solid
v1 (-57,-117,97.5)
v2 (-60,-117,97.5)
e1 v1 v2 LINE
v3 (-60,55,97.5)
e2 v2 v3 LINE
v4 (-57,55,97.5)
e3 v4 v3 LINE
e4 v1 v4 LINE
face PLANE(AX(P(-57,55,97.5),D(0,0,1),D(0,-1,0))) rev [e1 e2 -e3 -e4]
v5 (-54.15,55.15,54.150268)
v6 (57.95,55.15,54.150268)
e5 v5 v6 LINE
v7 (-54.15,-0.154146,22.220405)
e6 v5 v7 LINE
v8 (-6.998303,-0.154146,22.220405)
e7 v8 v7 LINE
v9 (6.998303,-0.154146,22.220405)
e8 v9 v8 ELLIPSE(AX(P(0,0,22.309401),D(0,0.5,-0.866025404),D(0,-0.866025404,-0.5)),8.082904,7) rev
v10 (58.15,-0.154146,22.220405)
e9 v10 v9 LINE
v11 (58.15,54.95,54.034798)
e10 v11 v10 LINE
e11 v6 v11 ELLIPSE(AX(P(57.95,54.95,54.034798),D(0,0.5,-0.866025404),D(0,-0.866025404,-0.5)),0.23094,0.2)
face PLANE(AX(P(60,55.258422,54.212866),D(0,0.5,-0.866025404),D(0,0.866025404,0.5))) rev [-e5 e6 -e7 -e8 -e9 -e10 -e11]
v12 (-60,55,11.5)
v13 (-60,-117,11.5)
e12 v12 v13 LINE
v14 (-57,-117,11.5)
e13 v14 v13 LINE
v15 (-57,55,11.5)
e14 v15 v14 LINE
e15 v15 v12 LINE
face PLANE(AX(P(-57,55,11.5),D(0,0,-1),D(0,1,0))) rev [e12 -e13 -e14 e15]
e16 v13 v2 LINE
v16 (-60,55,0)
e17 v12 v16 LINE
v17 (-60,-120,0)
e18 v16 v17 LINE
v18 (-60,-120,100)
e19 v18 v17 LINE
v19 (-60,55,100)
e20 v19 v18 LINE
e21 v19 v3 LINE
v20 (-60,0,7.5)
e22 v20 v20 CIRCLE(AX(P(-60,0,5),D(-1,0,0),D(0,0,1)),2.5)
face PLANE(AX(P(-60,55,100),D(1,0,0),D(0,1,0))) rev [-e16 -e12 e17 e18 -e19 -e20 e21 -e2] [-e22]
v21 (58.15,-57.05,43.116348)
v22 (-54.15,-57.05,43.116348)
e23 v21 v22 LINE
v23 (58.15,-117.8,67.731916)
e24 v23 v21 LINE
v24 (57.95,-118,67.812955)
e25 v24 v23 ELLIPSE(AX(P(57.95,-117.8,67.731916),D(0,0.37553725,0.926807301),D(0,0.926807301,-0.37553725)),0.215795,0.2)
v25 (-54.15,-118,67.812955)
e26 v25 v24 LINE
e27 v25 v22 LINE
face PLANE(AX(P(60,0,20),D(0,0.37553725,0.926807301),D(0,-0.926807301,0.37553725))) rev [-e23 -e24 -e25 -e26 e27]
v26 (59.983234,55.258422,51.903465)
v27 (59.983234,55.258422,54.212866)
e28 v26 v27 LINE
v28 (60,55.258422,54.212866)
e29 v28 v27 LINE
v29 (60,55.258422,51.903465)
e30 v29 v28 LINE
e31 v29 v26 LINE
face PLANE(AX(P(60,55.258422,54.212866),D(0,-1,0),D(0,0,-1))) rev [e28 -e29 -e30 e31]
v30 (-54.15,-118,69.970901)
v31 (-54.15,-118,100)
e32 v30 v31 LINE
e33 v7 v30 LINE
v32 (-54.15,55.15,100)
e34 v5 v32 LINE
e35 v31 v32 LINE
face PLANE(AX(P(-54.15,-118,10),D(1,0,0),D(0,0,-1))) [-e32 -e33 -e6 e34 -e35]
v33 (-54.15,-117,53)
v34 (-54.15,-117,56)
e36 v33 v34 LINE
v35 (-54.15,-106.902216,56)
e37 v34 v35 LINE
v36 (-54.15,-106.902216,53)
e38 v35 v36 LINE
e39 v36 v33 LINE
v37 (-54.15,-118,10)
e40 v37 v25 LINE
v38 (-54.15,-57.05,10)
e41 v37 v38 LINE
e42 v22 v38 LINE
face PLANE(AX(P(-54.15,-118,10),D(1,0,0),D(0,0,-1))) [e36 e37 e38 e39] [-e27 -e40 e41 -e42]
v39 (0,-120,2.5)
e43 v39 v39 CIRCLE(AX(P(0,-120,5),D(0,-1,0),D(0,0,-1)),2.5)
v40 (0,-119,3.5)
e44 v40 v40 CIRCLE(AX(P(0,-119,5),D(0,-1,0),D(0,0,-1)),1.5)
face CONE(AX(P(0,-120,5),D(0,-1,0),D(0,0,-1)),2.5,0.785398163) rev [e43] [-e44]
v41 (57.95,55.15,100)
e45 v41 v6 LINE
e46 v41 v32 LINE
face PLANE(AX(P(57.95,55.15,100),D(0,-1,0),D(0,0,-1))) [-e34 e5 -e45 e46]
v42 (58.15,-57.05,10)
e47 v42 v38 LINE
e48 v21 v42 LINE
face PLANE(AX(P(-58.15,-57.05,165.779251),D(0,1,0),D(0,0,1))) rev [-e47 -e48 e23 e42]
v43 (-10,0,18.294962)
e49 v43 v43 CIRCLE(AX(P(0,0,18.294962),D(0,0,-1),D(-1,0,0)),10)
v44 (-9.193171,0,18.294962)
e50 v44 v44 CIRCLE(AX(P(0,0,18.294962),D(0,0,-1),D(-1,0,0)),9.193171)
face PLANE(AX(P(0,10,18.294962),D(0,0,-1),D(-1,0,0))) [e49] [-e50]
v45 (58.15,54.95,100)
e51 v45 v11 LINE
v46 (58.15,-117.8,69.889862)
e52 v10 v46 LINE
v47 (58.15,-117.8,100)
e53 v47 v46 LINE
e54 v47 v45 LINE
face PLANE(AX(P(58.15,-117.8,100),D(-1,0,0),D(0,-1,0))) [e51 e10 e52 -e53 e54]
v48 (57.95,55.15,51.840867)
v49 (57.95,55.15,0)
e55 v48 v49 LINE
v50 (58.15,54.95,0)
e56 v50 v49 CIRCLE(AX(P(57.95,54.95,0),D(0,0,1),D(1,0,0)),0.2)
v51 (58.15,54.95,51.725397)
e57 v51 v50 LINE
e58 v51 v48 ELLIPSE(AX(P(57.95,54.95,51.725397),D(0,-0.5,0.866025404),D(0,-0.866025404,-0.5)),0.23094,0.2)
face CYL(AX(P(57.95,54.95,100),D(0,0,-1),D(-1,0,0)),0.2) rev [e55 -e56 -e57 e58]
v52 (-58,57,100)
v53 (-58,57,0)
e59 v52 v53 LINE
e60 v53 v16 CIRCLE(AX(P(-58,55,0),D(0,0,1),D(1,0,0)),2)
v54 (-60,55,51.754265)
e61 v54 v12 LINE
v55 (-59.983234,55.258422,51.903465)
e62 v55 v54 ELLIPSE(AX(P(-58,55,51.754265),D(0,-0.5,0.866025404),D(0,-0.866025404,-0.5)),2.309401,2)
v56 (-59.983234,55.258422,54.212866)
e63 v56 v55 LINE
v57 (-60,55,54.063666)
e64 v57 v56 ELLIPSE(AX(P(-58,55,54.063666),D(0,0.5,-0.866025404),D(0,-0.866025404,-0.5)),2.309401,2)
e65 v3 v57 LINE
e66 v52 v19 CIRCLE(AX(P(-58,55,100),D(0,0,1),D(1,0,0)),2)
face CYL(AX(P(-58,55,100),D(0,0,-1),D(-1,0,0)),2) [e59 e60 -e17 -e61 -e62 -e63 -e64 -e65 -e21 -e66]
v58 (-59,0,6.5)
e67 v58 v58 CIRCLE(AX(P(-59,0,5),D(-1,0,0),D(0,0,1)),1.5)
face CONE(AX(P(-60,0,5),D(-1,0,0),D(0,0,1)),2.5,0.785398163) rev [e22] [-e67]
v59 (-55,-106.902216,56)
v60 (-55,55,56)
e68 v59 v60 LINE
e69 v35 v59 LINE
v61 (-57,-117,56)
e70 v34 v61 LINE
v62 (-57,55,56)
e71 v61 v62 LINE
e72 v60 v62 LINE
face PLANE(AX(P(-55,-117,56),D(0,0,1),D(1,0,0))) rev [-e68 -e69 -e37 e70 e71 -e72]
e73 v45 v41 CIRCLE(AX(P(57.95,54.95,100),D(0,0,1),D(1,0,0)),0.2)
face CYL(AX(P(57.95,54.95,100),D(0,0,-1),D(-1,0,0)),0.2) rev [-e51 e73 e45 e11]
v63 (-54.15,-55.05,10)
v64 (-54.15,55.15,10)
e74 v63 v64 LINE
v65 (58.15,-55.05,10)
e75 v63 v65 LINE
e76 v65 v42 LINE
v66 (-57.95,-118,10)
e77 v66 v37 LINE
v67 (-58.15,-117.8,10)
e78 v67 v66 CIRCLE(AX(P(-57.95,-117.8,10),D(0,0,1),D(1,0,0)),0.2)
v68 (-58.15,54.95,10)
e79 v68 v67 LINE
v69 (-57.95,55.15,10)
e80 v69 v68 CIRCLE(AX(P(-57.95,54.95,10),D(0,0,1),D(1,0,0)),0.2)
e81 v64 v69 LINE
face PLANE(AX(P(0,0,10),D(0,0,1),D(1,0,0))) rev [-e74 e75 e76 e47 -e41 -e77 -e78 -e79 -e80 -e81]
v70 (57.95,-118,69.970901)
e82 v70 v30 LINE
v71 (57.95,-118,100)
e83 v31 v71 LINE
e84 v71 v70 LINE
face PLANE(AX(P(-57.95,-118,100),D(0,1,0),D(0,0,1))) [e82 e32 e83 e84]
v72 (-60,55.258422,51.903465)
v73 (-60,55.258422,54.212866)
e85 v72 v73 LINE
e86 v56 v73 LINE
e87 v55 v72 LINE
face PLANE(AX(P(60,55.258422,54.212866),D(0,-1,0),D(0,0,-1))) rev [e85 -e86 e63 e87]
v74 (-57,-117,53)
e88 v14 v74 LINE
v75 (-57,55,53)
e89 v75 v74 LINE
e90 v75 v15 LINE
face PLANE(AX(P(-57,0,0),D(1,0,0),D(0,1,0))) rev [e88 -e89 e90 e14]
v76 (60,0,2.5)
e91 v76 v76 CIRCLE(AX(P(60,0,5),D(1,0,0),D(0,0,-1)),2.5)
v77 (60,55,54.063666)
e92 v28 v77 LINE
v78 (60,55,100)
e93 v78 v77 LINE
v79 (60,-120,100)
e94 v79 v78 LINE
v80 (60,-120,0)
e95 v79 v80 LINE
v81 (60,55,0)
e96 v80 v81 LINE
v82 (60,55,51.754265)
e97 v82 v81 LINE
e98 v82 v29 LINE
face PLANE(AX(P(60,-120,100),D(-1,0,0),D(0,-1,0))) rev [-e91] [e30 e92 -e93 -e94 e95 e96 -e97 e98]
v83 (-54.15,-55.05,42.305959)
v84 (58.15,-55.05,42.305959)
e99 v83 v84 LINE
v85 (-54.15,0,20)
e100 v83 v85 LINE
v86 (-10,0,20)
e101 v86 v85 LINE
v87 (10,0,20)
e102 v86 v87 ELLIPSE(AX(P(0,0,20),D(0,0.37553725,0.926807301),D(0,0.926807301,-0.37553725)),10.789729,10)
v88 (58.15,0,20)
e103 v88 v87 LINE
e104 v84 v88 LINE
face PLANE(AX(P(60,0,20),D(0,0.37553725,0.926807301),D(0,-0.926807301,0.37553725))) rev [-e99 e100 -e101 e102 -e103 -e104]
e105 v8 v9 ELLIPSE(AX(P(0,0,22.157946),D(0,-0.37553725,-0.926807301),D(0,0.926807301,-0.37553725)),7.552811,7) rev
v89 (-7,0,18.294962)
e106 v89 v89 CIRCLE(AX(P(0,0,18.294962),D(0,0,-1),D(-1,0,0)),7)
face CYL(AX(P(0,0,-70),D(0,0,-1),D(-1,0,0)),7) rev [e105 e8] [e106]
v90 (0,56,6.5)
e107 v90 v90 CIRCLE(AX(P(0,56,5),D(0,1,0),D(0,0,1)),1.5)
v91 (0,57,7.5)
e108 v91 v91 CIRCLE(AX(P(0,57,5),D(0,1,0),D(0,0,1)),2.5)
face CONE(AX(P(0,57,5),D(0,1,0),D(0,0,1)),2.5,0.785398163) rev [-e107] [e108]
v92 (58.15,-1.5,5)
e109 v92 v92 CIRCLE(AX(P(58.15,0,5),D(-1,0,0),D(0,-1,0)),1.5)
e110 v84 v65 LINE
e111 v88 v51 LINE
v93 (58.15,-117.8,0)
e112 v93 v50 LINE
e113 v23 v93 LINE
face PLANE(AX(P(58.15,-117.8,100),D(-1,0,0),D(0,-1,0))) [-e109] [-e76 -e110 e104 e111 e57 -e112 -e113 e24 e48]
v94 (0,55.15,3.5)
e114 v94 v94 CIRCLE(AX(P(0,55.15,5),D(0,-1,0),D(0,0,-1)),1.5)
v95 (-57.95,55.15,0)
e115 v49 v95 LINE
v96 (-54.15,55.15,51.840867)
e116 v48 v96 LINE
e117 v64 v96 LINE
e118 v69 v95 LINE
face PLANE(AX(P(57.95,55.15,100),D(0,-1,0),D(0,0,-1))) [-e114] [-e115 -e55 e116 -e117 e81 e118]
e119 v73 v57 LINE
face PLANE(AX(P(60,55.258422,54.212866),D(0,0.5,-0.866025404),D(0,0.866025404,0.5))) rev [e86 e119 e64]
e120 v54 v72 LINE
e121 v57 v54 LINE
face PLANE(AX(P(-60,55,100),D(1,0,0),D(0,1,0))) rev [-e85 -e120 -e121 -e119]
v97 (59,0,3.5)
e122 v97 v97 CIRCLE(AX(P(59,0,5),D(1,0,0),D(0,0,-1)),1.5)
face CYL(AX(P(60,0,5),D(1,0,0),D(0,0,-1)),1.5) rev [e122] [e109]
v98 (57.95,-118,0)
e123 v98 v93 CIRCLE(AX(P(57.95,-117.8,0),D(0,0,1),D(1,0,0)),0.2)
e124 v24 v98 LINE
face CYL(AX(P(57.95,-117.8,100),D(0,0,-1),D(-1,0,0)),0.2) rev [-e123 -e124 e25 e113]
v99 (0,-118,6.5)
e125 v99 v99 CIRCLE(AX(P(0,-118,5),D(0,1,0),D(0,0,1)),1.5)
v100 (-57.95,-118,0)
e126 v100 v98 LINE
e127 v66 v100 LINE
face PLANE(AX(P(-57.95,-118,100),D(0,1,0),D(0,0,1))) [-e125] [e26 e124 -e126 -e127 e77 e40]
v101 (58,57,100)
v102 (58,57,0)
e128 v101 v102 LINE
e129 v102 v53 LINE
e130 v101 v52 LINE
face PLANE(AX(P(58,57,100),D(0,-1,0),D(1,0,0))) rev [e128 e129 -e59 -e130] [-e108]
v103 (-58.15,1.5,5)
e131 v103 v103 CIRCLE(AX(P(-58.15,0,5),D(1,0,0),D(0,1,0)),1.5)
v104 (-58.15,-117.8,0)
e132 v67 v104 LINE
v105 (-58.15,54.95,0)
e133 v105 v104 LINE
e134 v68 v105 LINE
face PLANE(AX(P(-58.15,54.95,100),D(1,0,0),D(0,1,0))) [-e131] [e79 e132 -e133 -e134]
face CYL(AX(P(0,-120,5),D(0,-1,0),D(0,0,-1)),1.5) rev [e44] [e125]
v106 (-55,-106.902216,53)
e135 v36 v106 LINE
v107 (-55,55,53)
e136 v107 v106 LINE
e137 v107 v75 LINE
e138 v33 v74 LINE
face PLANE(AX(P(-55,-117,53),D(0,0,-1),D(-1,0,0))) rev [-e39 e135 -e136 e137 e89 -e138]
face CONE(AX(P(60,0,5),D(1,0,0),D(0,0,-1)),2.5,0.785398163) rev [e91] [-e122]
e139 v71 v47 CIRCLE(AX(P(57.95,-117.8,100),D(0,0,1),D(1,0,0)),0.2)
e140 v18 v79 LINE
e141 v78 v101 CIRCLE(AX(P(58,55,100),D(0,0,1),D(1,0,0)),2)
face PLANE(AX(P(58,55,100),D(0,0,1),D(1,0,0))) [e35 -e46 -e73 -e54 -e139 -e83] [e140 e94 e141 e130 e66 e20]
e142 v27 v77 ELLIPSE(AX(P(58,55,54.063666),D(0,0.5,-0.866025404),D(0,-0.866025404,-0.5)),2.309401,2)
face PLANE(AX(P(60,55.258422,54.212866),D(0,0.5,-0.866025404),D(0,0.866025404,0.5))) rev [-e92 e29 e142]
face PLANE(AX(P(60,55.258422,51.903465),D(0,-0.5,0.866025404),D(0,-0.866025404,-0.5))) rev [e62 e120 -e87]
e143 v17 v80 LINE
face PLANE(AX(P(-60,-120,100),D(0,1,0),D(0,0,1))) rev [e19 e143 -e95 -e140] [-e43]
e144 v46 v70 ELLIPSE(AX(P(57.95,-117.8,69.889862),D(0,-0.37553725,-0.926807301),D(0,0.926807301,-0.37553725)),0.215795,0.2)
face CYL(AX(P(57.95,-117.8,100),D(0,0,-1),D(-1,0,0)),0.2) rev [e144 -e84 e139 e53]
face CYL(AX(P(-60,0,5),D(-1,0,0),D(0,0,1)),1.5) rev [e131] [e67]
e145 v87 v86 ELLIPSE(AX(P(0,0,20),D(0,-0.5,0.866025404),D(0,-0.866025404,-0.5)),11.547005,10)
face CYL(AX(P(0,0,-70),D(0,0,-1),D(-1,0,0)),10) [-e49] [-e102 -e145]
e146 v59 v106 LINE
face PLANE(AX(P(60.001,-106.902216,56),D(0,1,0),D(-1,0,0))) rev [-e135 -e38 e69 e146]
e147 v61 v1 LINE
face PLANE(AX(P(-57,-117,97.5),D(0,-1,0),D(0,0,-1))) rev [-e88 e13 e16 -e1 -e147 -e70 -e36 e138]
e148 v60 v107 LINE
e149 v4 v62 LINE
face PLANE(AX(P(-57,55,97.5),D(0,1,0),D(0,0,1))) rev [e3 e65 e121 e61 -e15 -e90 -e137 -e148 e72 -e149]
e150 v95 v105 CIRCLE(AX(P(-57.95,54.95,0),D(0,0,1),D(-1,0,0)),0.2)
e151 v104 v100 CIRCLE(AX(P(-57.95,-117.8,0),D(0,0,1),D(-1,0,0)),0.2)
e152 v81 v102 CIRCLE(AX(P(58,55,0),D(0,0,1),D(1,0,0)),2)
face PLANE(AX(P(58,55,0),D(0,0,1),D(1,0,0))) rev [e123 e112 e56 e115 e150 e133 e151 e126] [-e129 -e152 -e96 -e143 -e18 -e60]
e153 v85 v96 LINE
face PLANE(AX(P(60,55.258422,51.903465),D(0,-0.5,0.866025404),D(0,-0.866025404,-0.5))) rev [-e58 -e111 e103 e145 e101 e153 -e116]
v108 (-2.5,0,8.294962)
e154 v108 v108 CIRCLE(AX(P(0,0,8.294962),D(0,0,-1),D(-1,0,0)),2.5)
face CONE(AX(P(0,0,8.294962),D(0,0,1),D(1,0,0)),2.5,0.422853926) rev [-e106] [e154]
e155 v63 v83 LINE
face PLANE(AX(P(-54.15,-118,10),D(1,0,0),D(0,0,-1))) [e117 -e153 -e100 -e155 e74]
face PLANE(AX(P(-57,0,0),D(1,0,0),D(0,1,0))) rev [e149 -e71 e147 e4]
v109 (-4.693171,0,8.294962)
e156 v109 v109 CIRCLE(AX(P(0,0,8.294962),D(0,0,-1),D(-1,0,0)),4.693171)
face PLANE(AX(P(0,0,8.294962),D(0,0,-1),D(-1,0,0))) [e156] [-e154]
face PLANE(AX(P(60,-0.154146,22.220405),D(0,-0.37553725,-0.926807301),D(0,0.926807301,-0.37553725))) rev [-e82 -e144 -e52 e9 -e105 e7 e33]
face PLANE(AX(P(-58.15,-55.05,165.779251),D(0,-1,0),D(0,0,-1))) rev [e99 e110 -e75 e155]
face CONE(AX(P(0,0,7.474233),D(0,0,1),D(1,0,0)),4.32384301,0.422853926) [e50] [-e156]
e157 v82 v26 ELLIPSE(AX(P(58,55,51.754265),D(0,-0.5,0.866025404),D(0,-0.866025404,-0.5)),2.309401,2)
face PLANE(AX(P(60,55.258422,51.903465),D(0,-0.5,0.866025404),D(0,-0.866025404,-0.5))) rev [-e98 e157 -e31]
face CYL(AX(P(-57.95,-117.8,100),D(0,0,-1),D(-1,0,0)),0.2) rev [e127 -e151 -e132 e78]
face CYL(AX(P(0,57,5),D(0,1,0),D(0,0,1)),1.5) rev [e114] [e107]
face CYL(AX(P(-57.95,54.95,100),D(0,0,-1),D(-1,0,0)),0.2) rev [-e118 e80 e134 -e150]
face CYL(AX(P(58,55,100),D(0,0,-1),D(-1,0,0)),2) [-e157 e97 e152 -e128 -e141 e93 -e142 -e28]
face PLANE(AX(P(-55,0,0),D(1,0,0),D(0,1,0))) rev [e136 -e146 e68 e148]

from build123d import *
from build123d.topology import SkipClean

# Parameters (mm, degrees)
SALIENTE_EXTRUIR1_DEPTH                              = 100
SALIENTE_EXTRUIR3_DEPTH                              = 60
CROQUIS8_R                                           = 7
CORTAR_EXTRUIR2_DEPTH                                = 7.5
CORTAR_EXTRUIR3_DEPTH                                = 25
SALIENTE_EXTRUIR5_REACH                              = 169.332
CROQUIS12_W                                          = 116.3
CROQUIS12_H                                          = 2
AVELLANADO_PARA_TORNILLO_CON_CABEZA_2_D              = 3
AVELLANADO_PARA_TORNILLO_CON_CABEZA_2_DEPTH          = 10
AVELLANADO_PARA_TORNILLO_CON_CABEZA_2_CSINK_D        = 5
AVELLANADO_PARA_TORNILLO_CON_CABEZA_2_CSINK_ANGLE    = 90
AVELLANADO_PARA_TORNILLO_CON_CABEZA_2_TIP            = 0.901290929
AVELLANADO_PARA_TORNILLO_CON_CABEZA_2_ON_D           = 3
AVELLANADO_PARA_TORNILLO_CON_CABEZA_2_ON_DEPTH       = 10
AVELLANADO_PARA_TORNILLO_CON_CABEZA_2_ON_CSINK_D     = 5
AVELLANADO_PARA_TORNILLO_CON_CABEZA_2_ON_CSINK_ANGLE = 90
AVELLANADO_PARA_TORNILLO_CON_CABEZA_2_ON_TIP         = 0.901290929
CROQUIS18_R                                          = 10
CROQUIS18_R_2                                        = 3.723403092
CORTAR_EXTRUIR6_DEPTH                                = 10
CROQUIS21_W                                          = 4
CROQUIS21_H                                          = 173.15
SALIENTE_EXTRUIR6_DEPTH                              = 90
CROQUIS22_W                                          = 86
CROQUIS22_H                                          = 172
CORTAR_EXTRUIR7_DEPTH                                = 3
CROQUIS23_W                                          = 3
CROQUIS23_H                                          = 172
CORTAR_EXTRUIR8_DEPTH                                = 2
CORTAR_EXTRUIR9_REACH                                = 195.972
CROQUIS24_W                                          = 3
CROQUIS24_H                                          = 10.09778391
CROQUIS25_W                                          = 116.3
CROQUIS25_H                                          = 2
CORTAR_EXTRUIR10_DEPTH                               = 10


# Read off the part's stored shape, not the designer's step: Recubrir-Lámina1
with BuildPart() as part:
    # Croquis1 → Saliente-Extruir1 (new body)
    with BuildSketch(Plane.XY):
        with BuildLine():
            Line((60, -120), (60, 55))
            ThreePointArc((60, 55), (59.414213562, 56.414213562), (58, 57))
            Line((58, 57), (-58, 57))
            ThreePointArc((-58, 57), (-59.414213562, 56.414213562), (-60, 55))
            Line((-60, 55), (-60, -120))
            Line((-60, -120), (60, -120))
        make_face()
        with BuildLine():
            Line((-57.95, -118), (57.95, -118))
            ThreePointArc((57.95, -118), (58.091421356, -117.941421356), (58.15, -117.8))
            Line((58.15, -117.8), (58.15, 54.95))
            ThreePointArc((58.15, 54.95), (58.091421356, 55.091421356), (57.95, 55.15))
            Line((57.95, 55.15), (-57.95, 55.15))
            ThreePointArc((-57.95, 55.15), (-58.091421356, 55.091421356), (-58.15, 54.95))
            Line((-58.15, 54.95), (-58.15, -117.8))
            ThreePointArc((-58.15, -117.8), (-58.091421356, -117.941421356), (-57.95, -118))
        make_face(mode=Mode.SUBTRACT)
    extrude(amount=SALIENTE_EXTRUIR1_DEPTH)

    # Croquis2 → Saliente-Extruir3 (add, symmetric)
    with BuildSketch(Plane(origin=(0, 0, 0), x_dir=(0, 0, -1), z_dir=(1, 0, 0))):
        Polygon((-51.903464864, 55.258422081), (-20, 0), (-67.842054117, -118.071815959), (-70, -118.071815959), (-22.220404934, -0.154145841), (-54.21286594, 55.258422081), align=None)
    extrude(amount=SALIENTE_EXTRUIR3_DEPTH, both=True)

    # Croquis6 → Revolución1 (revolve)
    with BuildSketch(Plane(origin=(0, 0, 0), x_dir=(0, 0, -1), z_dir=(1, 0, 0)), mode=Mode.PRIVATE) as revoluci_n1_sk:
        Polygon((-24.041451884, 7), (-25.773502692, 10), (-18.294962095, 10), (-18.294962095, 8), (-8.294962095, 8), (-8.294962095, 5), (-23.294962095, 5), (-23.294962095, 7), align=None)
    revolve(revoluci_n1_sk.sketch.rotate(Axis((0, 0, -70), (0, 0, 1)), 90), axis=Axis((0, 0, -70), (0, 0, 1)))

    # Croquis8 → Cortar-Extruir2 (cut, symmetric)
    with SkipClean():  # the faces are left unmerged after this step: merging them gives an invalid solid
        with BuildSketch(Plane.XY.offset(23.294962095)):
            with Locations(Location((0, 0, 0), (0, 0, 154.623066475))):
                Circle(CROQUIS8_R)
        extrude(amount=CORTAR_EXTRUIR2_DEPTH, both=True, mode=Mode.SUBTRACT)

    # Croquis10 → Cortar-Extruir3 (cut, symmetric)
    with BuildSketch(Plane(origin=(0, 0, 0), x_dir=(0, 0, -1), z_dir=(1, 0, 0))):
        Polygon((-29.700523202, 12.801799046), (-22.675993136, 0.634956072), (-22.220404934, -0.154145841), (-27.761841087, -13.830135337), (-29.486165756, -12.415050666), align=None)
    extrude(amount=CORTAR_EXTRUIR3_DEPTH, both=True, mode=Mode.SUBTRACT)

    # Saliente-Extruir5: up to this plane
    saliente_extruir5_end = Plane(origin=(60, 0, 20), z_dir=(0, 0.3755372500045795, 0.9268073013625854))
    # Croquis12 → Saliente-Extruir5 (add, up to the surface)
    with BuildSketch(Plane.XY, mode=Mode.PRIVATE) as saliente_extruir5_sk1:
        with Locations((0, -56.05)):
            Rectangle(CROQUIS12_W, CROQUIS12_H)
    saliente_extruir5_tool1 = split(extrude(saliente_extruir5_sk1.sketch, amount=SALIENTE_EXTRUIR5_REACH, mode=Mode.PRIVATE), bisect_by=saliente_extruir5_end, keep=Keep.BOTH, mode=Mode.PRIVATE)
    add(saliente_extruir5_tool1.solids().sort_by_distance((0, -56.05, 0))[0])

    # Croquis14 → Avellanado para tornillo con cabeza elev (revolve, cut)
    with BuildSketch(Plane(origin=(60, 0, 5), x_dir=(0, 0, -1), z_dir=(0, 1, 0))):
        Polygon((0, 0), (0, 10.901290929), (1.5, 10), (1.5, 1), (2.5, 0), align=None)
    avellanado_para_tornillo_con_cabeza_elev = revolve(axis=Axis((66.35, 0, 5), (-1, 0, 0)), mode=Mode.SUBTRACT)

    # Simetría1: Avellanado para tornillo con cabeza elev across plane
    add(avellanado_para_tornillo_con_cabeza_elev.mirror(Plane(origin=(0, 0, 0), x_dir=(0, 0, 1), z_dir=(1, 0, 0))), mode=Mode.SUBTRACT)

    # Avellanado para tornillo con cabeza  2
    with Locations(Plane(origin=(0, 57, 5), x_dir=(1, 0, 0), z_dir=(0, 1, 0))):
        with Locations((0, 0)):
            CounterSinkHole(AVELLANADO_PARA_TORNILLO_CON_CABEZA_2_D / 2, AVELLANADO_PARA_TORNILLO_CON_CABEZA_2_CSINK_D / 2, depth=AVELLANADO_PARA_TORNILLO_CON_CABEZA_2_DEPTH, counter_sink_angle=AVELLANADO_PARA_TORNILLO_CON_CABEZA_2_CSINK_ANGLE)
            with Locations((0, 0, -(AVELLANADO_PARA_TORNILLO_CON_CABEZA_2_DEPTH + AVELLANADO_PARA_TORNILLO_CON_CABEZA_2_TIP / 2))):  # 118° drill point
                Cone(0, AVELLANADO_PARA_TORNILLO_CON_CABEZA_2_D / 2, AVELLANADO_PARA_TORNILLO_CON_CABEZA_2_TIP, mode=Mode.SUBTRACT)

    # Avellanado para tornillo con cabeza 2 on
    with Locations(Plane(origin=(0, -120, 5), x_dir=(0, 0, -1), z_dir=(0, -1, 0))):
        with Locations((0, 0)):
            CounterSinkHole(AVELLANADO_PARA_TORNILLO_CON_CABEZA_2_ON_D / 2, AVELLANADO_PARA_TORNILLO_CON_CABEZA_2_ON_CSINK_D / 2, depth=AVELLANADO_PARA_TORNILLO_CON_CABEZA_2_ON_DEPTH, counter_sink_angle=AVELLANADO_PARA_TORNILLO_CON_CABEZA_2_ON_CSINK_ANGLE)
            with Locations((0, 0, -(AVELLANADO_PARA_TORNILLO_CON_CABEZA_2_ON_DEPTH + AVELLANADO_PARA_TORNILLO_CON_CABEZA_2_ON_TIP / 2))):  # 118° drill point
                Cone(0, AVELLANADO_PARA_TORNILLO_CON_CABEZA_2_ON_D / 2, AVELLANADO_PARA_TORNILLO_CON_CABEZA_2_ON_TIP, mode=Mode.SUBTRACT)

    # Croquis18 → Cortar-Extruir6 (cut)
    with BuildSketch(Plane(origin=(0, 0, 8.294962095), x_dir=(-1, 0, 0), z_dir=(0, 0, -1))):
        Circle(CROQUIS18_R)
        Circle(CROQUIS18_R_2, mode=Mode.SUBTRACT)
    extrude(amount=-CORTAR_EXTRUIR6_DEPTH, mode=Mode.SUBTRACT)

    # Recubrir-Lámina1 outline → Recubrir-Lámina1 (revolve)
    with BuildSketch(Plane.XZ):
        Polygon((7, 18.294962095), (2.5, 8.294962095), (4.69317122, 8.294962095), (9.19317122, 18.294962095), align=None)
    revolve(axis=Axis((0, 0, 0), (0, 0, 1)))

    # Croquis21 → Saliente-Extruir6 (add)
    with BuildSketch(Plane.XY.offset(100)):
        with Locations((-56.15, -31.425)):
            Rectangle(CROQUIS21_W, CROQUIS21_H)
    extrude(amount=-SALIENTE_EXTRUIR6_DEPTH)

    # Croquis22 → Cortar-Extruir7 (cut)
    with BuildSketch(Plane.ZY.offset(60)):
        with Locations((54.5, -31)):
            Rectangle(CROQUIS22_W, CROQUIS22_H)
    extrude(amount=-CORTAR_EXTRUIR7_DEPTH, mode=Mode.SUBTRACT)

    # Croquis23 → Cortar-Extruir8 (cut)
    with BuildSketch(Plane.ZY.offset(57)):
        with Locations((54.5, -31)):
            Rectangle(CROQUIS23_W, CROQUIS23_H)
    extrude(amount=-CORTAR_EXTRUIR8_DEPTH, mode=Mode.SUBTRACT)

    # Croquis24 → Cortar-Extruir9 (cut, up to next)
    with BuildSketch(Plane.ZY.offset(55), mode=Mode.PRIVATE) as cortar_extruir9_sk1:
        with Locations((54.5, -111.951108045)):
            Rectangle(CROQUIS24_W, CROQUIS24_H)
    cortar_extruir9_tool1 = extrude(cortar_extruir9_sk1.sketch, amount=-CORTAR_EXTRUIR9_REACH, mode=Mode.PRIVATE) & part.part
    add(cortar_extruir9_tool1.solids().sort_by_distance((-55, -111.951108, 54.5))[0], mode=Mode.SUBTRACT)

    # Croquis25 → Cortar-Extruir10 (cut)
    with BuildSketch(Plane(origin=(0, 0, 0), x_dir=(-1, 0, 0), z_dir=(0, 0, -1))):
        with Locations((0, -56.05)):
            Rectangle(CROQUIS25_W, CROQUIS25_H)
    extrude(amount=-CORTAR_EXTRUIR10_DEPTH, mode=Mode.SUBTRACT)


solid = part.part
